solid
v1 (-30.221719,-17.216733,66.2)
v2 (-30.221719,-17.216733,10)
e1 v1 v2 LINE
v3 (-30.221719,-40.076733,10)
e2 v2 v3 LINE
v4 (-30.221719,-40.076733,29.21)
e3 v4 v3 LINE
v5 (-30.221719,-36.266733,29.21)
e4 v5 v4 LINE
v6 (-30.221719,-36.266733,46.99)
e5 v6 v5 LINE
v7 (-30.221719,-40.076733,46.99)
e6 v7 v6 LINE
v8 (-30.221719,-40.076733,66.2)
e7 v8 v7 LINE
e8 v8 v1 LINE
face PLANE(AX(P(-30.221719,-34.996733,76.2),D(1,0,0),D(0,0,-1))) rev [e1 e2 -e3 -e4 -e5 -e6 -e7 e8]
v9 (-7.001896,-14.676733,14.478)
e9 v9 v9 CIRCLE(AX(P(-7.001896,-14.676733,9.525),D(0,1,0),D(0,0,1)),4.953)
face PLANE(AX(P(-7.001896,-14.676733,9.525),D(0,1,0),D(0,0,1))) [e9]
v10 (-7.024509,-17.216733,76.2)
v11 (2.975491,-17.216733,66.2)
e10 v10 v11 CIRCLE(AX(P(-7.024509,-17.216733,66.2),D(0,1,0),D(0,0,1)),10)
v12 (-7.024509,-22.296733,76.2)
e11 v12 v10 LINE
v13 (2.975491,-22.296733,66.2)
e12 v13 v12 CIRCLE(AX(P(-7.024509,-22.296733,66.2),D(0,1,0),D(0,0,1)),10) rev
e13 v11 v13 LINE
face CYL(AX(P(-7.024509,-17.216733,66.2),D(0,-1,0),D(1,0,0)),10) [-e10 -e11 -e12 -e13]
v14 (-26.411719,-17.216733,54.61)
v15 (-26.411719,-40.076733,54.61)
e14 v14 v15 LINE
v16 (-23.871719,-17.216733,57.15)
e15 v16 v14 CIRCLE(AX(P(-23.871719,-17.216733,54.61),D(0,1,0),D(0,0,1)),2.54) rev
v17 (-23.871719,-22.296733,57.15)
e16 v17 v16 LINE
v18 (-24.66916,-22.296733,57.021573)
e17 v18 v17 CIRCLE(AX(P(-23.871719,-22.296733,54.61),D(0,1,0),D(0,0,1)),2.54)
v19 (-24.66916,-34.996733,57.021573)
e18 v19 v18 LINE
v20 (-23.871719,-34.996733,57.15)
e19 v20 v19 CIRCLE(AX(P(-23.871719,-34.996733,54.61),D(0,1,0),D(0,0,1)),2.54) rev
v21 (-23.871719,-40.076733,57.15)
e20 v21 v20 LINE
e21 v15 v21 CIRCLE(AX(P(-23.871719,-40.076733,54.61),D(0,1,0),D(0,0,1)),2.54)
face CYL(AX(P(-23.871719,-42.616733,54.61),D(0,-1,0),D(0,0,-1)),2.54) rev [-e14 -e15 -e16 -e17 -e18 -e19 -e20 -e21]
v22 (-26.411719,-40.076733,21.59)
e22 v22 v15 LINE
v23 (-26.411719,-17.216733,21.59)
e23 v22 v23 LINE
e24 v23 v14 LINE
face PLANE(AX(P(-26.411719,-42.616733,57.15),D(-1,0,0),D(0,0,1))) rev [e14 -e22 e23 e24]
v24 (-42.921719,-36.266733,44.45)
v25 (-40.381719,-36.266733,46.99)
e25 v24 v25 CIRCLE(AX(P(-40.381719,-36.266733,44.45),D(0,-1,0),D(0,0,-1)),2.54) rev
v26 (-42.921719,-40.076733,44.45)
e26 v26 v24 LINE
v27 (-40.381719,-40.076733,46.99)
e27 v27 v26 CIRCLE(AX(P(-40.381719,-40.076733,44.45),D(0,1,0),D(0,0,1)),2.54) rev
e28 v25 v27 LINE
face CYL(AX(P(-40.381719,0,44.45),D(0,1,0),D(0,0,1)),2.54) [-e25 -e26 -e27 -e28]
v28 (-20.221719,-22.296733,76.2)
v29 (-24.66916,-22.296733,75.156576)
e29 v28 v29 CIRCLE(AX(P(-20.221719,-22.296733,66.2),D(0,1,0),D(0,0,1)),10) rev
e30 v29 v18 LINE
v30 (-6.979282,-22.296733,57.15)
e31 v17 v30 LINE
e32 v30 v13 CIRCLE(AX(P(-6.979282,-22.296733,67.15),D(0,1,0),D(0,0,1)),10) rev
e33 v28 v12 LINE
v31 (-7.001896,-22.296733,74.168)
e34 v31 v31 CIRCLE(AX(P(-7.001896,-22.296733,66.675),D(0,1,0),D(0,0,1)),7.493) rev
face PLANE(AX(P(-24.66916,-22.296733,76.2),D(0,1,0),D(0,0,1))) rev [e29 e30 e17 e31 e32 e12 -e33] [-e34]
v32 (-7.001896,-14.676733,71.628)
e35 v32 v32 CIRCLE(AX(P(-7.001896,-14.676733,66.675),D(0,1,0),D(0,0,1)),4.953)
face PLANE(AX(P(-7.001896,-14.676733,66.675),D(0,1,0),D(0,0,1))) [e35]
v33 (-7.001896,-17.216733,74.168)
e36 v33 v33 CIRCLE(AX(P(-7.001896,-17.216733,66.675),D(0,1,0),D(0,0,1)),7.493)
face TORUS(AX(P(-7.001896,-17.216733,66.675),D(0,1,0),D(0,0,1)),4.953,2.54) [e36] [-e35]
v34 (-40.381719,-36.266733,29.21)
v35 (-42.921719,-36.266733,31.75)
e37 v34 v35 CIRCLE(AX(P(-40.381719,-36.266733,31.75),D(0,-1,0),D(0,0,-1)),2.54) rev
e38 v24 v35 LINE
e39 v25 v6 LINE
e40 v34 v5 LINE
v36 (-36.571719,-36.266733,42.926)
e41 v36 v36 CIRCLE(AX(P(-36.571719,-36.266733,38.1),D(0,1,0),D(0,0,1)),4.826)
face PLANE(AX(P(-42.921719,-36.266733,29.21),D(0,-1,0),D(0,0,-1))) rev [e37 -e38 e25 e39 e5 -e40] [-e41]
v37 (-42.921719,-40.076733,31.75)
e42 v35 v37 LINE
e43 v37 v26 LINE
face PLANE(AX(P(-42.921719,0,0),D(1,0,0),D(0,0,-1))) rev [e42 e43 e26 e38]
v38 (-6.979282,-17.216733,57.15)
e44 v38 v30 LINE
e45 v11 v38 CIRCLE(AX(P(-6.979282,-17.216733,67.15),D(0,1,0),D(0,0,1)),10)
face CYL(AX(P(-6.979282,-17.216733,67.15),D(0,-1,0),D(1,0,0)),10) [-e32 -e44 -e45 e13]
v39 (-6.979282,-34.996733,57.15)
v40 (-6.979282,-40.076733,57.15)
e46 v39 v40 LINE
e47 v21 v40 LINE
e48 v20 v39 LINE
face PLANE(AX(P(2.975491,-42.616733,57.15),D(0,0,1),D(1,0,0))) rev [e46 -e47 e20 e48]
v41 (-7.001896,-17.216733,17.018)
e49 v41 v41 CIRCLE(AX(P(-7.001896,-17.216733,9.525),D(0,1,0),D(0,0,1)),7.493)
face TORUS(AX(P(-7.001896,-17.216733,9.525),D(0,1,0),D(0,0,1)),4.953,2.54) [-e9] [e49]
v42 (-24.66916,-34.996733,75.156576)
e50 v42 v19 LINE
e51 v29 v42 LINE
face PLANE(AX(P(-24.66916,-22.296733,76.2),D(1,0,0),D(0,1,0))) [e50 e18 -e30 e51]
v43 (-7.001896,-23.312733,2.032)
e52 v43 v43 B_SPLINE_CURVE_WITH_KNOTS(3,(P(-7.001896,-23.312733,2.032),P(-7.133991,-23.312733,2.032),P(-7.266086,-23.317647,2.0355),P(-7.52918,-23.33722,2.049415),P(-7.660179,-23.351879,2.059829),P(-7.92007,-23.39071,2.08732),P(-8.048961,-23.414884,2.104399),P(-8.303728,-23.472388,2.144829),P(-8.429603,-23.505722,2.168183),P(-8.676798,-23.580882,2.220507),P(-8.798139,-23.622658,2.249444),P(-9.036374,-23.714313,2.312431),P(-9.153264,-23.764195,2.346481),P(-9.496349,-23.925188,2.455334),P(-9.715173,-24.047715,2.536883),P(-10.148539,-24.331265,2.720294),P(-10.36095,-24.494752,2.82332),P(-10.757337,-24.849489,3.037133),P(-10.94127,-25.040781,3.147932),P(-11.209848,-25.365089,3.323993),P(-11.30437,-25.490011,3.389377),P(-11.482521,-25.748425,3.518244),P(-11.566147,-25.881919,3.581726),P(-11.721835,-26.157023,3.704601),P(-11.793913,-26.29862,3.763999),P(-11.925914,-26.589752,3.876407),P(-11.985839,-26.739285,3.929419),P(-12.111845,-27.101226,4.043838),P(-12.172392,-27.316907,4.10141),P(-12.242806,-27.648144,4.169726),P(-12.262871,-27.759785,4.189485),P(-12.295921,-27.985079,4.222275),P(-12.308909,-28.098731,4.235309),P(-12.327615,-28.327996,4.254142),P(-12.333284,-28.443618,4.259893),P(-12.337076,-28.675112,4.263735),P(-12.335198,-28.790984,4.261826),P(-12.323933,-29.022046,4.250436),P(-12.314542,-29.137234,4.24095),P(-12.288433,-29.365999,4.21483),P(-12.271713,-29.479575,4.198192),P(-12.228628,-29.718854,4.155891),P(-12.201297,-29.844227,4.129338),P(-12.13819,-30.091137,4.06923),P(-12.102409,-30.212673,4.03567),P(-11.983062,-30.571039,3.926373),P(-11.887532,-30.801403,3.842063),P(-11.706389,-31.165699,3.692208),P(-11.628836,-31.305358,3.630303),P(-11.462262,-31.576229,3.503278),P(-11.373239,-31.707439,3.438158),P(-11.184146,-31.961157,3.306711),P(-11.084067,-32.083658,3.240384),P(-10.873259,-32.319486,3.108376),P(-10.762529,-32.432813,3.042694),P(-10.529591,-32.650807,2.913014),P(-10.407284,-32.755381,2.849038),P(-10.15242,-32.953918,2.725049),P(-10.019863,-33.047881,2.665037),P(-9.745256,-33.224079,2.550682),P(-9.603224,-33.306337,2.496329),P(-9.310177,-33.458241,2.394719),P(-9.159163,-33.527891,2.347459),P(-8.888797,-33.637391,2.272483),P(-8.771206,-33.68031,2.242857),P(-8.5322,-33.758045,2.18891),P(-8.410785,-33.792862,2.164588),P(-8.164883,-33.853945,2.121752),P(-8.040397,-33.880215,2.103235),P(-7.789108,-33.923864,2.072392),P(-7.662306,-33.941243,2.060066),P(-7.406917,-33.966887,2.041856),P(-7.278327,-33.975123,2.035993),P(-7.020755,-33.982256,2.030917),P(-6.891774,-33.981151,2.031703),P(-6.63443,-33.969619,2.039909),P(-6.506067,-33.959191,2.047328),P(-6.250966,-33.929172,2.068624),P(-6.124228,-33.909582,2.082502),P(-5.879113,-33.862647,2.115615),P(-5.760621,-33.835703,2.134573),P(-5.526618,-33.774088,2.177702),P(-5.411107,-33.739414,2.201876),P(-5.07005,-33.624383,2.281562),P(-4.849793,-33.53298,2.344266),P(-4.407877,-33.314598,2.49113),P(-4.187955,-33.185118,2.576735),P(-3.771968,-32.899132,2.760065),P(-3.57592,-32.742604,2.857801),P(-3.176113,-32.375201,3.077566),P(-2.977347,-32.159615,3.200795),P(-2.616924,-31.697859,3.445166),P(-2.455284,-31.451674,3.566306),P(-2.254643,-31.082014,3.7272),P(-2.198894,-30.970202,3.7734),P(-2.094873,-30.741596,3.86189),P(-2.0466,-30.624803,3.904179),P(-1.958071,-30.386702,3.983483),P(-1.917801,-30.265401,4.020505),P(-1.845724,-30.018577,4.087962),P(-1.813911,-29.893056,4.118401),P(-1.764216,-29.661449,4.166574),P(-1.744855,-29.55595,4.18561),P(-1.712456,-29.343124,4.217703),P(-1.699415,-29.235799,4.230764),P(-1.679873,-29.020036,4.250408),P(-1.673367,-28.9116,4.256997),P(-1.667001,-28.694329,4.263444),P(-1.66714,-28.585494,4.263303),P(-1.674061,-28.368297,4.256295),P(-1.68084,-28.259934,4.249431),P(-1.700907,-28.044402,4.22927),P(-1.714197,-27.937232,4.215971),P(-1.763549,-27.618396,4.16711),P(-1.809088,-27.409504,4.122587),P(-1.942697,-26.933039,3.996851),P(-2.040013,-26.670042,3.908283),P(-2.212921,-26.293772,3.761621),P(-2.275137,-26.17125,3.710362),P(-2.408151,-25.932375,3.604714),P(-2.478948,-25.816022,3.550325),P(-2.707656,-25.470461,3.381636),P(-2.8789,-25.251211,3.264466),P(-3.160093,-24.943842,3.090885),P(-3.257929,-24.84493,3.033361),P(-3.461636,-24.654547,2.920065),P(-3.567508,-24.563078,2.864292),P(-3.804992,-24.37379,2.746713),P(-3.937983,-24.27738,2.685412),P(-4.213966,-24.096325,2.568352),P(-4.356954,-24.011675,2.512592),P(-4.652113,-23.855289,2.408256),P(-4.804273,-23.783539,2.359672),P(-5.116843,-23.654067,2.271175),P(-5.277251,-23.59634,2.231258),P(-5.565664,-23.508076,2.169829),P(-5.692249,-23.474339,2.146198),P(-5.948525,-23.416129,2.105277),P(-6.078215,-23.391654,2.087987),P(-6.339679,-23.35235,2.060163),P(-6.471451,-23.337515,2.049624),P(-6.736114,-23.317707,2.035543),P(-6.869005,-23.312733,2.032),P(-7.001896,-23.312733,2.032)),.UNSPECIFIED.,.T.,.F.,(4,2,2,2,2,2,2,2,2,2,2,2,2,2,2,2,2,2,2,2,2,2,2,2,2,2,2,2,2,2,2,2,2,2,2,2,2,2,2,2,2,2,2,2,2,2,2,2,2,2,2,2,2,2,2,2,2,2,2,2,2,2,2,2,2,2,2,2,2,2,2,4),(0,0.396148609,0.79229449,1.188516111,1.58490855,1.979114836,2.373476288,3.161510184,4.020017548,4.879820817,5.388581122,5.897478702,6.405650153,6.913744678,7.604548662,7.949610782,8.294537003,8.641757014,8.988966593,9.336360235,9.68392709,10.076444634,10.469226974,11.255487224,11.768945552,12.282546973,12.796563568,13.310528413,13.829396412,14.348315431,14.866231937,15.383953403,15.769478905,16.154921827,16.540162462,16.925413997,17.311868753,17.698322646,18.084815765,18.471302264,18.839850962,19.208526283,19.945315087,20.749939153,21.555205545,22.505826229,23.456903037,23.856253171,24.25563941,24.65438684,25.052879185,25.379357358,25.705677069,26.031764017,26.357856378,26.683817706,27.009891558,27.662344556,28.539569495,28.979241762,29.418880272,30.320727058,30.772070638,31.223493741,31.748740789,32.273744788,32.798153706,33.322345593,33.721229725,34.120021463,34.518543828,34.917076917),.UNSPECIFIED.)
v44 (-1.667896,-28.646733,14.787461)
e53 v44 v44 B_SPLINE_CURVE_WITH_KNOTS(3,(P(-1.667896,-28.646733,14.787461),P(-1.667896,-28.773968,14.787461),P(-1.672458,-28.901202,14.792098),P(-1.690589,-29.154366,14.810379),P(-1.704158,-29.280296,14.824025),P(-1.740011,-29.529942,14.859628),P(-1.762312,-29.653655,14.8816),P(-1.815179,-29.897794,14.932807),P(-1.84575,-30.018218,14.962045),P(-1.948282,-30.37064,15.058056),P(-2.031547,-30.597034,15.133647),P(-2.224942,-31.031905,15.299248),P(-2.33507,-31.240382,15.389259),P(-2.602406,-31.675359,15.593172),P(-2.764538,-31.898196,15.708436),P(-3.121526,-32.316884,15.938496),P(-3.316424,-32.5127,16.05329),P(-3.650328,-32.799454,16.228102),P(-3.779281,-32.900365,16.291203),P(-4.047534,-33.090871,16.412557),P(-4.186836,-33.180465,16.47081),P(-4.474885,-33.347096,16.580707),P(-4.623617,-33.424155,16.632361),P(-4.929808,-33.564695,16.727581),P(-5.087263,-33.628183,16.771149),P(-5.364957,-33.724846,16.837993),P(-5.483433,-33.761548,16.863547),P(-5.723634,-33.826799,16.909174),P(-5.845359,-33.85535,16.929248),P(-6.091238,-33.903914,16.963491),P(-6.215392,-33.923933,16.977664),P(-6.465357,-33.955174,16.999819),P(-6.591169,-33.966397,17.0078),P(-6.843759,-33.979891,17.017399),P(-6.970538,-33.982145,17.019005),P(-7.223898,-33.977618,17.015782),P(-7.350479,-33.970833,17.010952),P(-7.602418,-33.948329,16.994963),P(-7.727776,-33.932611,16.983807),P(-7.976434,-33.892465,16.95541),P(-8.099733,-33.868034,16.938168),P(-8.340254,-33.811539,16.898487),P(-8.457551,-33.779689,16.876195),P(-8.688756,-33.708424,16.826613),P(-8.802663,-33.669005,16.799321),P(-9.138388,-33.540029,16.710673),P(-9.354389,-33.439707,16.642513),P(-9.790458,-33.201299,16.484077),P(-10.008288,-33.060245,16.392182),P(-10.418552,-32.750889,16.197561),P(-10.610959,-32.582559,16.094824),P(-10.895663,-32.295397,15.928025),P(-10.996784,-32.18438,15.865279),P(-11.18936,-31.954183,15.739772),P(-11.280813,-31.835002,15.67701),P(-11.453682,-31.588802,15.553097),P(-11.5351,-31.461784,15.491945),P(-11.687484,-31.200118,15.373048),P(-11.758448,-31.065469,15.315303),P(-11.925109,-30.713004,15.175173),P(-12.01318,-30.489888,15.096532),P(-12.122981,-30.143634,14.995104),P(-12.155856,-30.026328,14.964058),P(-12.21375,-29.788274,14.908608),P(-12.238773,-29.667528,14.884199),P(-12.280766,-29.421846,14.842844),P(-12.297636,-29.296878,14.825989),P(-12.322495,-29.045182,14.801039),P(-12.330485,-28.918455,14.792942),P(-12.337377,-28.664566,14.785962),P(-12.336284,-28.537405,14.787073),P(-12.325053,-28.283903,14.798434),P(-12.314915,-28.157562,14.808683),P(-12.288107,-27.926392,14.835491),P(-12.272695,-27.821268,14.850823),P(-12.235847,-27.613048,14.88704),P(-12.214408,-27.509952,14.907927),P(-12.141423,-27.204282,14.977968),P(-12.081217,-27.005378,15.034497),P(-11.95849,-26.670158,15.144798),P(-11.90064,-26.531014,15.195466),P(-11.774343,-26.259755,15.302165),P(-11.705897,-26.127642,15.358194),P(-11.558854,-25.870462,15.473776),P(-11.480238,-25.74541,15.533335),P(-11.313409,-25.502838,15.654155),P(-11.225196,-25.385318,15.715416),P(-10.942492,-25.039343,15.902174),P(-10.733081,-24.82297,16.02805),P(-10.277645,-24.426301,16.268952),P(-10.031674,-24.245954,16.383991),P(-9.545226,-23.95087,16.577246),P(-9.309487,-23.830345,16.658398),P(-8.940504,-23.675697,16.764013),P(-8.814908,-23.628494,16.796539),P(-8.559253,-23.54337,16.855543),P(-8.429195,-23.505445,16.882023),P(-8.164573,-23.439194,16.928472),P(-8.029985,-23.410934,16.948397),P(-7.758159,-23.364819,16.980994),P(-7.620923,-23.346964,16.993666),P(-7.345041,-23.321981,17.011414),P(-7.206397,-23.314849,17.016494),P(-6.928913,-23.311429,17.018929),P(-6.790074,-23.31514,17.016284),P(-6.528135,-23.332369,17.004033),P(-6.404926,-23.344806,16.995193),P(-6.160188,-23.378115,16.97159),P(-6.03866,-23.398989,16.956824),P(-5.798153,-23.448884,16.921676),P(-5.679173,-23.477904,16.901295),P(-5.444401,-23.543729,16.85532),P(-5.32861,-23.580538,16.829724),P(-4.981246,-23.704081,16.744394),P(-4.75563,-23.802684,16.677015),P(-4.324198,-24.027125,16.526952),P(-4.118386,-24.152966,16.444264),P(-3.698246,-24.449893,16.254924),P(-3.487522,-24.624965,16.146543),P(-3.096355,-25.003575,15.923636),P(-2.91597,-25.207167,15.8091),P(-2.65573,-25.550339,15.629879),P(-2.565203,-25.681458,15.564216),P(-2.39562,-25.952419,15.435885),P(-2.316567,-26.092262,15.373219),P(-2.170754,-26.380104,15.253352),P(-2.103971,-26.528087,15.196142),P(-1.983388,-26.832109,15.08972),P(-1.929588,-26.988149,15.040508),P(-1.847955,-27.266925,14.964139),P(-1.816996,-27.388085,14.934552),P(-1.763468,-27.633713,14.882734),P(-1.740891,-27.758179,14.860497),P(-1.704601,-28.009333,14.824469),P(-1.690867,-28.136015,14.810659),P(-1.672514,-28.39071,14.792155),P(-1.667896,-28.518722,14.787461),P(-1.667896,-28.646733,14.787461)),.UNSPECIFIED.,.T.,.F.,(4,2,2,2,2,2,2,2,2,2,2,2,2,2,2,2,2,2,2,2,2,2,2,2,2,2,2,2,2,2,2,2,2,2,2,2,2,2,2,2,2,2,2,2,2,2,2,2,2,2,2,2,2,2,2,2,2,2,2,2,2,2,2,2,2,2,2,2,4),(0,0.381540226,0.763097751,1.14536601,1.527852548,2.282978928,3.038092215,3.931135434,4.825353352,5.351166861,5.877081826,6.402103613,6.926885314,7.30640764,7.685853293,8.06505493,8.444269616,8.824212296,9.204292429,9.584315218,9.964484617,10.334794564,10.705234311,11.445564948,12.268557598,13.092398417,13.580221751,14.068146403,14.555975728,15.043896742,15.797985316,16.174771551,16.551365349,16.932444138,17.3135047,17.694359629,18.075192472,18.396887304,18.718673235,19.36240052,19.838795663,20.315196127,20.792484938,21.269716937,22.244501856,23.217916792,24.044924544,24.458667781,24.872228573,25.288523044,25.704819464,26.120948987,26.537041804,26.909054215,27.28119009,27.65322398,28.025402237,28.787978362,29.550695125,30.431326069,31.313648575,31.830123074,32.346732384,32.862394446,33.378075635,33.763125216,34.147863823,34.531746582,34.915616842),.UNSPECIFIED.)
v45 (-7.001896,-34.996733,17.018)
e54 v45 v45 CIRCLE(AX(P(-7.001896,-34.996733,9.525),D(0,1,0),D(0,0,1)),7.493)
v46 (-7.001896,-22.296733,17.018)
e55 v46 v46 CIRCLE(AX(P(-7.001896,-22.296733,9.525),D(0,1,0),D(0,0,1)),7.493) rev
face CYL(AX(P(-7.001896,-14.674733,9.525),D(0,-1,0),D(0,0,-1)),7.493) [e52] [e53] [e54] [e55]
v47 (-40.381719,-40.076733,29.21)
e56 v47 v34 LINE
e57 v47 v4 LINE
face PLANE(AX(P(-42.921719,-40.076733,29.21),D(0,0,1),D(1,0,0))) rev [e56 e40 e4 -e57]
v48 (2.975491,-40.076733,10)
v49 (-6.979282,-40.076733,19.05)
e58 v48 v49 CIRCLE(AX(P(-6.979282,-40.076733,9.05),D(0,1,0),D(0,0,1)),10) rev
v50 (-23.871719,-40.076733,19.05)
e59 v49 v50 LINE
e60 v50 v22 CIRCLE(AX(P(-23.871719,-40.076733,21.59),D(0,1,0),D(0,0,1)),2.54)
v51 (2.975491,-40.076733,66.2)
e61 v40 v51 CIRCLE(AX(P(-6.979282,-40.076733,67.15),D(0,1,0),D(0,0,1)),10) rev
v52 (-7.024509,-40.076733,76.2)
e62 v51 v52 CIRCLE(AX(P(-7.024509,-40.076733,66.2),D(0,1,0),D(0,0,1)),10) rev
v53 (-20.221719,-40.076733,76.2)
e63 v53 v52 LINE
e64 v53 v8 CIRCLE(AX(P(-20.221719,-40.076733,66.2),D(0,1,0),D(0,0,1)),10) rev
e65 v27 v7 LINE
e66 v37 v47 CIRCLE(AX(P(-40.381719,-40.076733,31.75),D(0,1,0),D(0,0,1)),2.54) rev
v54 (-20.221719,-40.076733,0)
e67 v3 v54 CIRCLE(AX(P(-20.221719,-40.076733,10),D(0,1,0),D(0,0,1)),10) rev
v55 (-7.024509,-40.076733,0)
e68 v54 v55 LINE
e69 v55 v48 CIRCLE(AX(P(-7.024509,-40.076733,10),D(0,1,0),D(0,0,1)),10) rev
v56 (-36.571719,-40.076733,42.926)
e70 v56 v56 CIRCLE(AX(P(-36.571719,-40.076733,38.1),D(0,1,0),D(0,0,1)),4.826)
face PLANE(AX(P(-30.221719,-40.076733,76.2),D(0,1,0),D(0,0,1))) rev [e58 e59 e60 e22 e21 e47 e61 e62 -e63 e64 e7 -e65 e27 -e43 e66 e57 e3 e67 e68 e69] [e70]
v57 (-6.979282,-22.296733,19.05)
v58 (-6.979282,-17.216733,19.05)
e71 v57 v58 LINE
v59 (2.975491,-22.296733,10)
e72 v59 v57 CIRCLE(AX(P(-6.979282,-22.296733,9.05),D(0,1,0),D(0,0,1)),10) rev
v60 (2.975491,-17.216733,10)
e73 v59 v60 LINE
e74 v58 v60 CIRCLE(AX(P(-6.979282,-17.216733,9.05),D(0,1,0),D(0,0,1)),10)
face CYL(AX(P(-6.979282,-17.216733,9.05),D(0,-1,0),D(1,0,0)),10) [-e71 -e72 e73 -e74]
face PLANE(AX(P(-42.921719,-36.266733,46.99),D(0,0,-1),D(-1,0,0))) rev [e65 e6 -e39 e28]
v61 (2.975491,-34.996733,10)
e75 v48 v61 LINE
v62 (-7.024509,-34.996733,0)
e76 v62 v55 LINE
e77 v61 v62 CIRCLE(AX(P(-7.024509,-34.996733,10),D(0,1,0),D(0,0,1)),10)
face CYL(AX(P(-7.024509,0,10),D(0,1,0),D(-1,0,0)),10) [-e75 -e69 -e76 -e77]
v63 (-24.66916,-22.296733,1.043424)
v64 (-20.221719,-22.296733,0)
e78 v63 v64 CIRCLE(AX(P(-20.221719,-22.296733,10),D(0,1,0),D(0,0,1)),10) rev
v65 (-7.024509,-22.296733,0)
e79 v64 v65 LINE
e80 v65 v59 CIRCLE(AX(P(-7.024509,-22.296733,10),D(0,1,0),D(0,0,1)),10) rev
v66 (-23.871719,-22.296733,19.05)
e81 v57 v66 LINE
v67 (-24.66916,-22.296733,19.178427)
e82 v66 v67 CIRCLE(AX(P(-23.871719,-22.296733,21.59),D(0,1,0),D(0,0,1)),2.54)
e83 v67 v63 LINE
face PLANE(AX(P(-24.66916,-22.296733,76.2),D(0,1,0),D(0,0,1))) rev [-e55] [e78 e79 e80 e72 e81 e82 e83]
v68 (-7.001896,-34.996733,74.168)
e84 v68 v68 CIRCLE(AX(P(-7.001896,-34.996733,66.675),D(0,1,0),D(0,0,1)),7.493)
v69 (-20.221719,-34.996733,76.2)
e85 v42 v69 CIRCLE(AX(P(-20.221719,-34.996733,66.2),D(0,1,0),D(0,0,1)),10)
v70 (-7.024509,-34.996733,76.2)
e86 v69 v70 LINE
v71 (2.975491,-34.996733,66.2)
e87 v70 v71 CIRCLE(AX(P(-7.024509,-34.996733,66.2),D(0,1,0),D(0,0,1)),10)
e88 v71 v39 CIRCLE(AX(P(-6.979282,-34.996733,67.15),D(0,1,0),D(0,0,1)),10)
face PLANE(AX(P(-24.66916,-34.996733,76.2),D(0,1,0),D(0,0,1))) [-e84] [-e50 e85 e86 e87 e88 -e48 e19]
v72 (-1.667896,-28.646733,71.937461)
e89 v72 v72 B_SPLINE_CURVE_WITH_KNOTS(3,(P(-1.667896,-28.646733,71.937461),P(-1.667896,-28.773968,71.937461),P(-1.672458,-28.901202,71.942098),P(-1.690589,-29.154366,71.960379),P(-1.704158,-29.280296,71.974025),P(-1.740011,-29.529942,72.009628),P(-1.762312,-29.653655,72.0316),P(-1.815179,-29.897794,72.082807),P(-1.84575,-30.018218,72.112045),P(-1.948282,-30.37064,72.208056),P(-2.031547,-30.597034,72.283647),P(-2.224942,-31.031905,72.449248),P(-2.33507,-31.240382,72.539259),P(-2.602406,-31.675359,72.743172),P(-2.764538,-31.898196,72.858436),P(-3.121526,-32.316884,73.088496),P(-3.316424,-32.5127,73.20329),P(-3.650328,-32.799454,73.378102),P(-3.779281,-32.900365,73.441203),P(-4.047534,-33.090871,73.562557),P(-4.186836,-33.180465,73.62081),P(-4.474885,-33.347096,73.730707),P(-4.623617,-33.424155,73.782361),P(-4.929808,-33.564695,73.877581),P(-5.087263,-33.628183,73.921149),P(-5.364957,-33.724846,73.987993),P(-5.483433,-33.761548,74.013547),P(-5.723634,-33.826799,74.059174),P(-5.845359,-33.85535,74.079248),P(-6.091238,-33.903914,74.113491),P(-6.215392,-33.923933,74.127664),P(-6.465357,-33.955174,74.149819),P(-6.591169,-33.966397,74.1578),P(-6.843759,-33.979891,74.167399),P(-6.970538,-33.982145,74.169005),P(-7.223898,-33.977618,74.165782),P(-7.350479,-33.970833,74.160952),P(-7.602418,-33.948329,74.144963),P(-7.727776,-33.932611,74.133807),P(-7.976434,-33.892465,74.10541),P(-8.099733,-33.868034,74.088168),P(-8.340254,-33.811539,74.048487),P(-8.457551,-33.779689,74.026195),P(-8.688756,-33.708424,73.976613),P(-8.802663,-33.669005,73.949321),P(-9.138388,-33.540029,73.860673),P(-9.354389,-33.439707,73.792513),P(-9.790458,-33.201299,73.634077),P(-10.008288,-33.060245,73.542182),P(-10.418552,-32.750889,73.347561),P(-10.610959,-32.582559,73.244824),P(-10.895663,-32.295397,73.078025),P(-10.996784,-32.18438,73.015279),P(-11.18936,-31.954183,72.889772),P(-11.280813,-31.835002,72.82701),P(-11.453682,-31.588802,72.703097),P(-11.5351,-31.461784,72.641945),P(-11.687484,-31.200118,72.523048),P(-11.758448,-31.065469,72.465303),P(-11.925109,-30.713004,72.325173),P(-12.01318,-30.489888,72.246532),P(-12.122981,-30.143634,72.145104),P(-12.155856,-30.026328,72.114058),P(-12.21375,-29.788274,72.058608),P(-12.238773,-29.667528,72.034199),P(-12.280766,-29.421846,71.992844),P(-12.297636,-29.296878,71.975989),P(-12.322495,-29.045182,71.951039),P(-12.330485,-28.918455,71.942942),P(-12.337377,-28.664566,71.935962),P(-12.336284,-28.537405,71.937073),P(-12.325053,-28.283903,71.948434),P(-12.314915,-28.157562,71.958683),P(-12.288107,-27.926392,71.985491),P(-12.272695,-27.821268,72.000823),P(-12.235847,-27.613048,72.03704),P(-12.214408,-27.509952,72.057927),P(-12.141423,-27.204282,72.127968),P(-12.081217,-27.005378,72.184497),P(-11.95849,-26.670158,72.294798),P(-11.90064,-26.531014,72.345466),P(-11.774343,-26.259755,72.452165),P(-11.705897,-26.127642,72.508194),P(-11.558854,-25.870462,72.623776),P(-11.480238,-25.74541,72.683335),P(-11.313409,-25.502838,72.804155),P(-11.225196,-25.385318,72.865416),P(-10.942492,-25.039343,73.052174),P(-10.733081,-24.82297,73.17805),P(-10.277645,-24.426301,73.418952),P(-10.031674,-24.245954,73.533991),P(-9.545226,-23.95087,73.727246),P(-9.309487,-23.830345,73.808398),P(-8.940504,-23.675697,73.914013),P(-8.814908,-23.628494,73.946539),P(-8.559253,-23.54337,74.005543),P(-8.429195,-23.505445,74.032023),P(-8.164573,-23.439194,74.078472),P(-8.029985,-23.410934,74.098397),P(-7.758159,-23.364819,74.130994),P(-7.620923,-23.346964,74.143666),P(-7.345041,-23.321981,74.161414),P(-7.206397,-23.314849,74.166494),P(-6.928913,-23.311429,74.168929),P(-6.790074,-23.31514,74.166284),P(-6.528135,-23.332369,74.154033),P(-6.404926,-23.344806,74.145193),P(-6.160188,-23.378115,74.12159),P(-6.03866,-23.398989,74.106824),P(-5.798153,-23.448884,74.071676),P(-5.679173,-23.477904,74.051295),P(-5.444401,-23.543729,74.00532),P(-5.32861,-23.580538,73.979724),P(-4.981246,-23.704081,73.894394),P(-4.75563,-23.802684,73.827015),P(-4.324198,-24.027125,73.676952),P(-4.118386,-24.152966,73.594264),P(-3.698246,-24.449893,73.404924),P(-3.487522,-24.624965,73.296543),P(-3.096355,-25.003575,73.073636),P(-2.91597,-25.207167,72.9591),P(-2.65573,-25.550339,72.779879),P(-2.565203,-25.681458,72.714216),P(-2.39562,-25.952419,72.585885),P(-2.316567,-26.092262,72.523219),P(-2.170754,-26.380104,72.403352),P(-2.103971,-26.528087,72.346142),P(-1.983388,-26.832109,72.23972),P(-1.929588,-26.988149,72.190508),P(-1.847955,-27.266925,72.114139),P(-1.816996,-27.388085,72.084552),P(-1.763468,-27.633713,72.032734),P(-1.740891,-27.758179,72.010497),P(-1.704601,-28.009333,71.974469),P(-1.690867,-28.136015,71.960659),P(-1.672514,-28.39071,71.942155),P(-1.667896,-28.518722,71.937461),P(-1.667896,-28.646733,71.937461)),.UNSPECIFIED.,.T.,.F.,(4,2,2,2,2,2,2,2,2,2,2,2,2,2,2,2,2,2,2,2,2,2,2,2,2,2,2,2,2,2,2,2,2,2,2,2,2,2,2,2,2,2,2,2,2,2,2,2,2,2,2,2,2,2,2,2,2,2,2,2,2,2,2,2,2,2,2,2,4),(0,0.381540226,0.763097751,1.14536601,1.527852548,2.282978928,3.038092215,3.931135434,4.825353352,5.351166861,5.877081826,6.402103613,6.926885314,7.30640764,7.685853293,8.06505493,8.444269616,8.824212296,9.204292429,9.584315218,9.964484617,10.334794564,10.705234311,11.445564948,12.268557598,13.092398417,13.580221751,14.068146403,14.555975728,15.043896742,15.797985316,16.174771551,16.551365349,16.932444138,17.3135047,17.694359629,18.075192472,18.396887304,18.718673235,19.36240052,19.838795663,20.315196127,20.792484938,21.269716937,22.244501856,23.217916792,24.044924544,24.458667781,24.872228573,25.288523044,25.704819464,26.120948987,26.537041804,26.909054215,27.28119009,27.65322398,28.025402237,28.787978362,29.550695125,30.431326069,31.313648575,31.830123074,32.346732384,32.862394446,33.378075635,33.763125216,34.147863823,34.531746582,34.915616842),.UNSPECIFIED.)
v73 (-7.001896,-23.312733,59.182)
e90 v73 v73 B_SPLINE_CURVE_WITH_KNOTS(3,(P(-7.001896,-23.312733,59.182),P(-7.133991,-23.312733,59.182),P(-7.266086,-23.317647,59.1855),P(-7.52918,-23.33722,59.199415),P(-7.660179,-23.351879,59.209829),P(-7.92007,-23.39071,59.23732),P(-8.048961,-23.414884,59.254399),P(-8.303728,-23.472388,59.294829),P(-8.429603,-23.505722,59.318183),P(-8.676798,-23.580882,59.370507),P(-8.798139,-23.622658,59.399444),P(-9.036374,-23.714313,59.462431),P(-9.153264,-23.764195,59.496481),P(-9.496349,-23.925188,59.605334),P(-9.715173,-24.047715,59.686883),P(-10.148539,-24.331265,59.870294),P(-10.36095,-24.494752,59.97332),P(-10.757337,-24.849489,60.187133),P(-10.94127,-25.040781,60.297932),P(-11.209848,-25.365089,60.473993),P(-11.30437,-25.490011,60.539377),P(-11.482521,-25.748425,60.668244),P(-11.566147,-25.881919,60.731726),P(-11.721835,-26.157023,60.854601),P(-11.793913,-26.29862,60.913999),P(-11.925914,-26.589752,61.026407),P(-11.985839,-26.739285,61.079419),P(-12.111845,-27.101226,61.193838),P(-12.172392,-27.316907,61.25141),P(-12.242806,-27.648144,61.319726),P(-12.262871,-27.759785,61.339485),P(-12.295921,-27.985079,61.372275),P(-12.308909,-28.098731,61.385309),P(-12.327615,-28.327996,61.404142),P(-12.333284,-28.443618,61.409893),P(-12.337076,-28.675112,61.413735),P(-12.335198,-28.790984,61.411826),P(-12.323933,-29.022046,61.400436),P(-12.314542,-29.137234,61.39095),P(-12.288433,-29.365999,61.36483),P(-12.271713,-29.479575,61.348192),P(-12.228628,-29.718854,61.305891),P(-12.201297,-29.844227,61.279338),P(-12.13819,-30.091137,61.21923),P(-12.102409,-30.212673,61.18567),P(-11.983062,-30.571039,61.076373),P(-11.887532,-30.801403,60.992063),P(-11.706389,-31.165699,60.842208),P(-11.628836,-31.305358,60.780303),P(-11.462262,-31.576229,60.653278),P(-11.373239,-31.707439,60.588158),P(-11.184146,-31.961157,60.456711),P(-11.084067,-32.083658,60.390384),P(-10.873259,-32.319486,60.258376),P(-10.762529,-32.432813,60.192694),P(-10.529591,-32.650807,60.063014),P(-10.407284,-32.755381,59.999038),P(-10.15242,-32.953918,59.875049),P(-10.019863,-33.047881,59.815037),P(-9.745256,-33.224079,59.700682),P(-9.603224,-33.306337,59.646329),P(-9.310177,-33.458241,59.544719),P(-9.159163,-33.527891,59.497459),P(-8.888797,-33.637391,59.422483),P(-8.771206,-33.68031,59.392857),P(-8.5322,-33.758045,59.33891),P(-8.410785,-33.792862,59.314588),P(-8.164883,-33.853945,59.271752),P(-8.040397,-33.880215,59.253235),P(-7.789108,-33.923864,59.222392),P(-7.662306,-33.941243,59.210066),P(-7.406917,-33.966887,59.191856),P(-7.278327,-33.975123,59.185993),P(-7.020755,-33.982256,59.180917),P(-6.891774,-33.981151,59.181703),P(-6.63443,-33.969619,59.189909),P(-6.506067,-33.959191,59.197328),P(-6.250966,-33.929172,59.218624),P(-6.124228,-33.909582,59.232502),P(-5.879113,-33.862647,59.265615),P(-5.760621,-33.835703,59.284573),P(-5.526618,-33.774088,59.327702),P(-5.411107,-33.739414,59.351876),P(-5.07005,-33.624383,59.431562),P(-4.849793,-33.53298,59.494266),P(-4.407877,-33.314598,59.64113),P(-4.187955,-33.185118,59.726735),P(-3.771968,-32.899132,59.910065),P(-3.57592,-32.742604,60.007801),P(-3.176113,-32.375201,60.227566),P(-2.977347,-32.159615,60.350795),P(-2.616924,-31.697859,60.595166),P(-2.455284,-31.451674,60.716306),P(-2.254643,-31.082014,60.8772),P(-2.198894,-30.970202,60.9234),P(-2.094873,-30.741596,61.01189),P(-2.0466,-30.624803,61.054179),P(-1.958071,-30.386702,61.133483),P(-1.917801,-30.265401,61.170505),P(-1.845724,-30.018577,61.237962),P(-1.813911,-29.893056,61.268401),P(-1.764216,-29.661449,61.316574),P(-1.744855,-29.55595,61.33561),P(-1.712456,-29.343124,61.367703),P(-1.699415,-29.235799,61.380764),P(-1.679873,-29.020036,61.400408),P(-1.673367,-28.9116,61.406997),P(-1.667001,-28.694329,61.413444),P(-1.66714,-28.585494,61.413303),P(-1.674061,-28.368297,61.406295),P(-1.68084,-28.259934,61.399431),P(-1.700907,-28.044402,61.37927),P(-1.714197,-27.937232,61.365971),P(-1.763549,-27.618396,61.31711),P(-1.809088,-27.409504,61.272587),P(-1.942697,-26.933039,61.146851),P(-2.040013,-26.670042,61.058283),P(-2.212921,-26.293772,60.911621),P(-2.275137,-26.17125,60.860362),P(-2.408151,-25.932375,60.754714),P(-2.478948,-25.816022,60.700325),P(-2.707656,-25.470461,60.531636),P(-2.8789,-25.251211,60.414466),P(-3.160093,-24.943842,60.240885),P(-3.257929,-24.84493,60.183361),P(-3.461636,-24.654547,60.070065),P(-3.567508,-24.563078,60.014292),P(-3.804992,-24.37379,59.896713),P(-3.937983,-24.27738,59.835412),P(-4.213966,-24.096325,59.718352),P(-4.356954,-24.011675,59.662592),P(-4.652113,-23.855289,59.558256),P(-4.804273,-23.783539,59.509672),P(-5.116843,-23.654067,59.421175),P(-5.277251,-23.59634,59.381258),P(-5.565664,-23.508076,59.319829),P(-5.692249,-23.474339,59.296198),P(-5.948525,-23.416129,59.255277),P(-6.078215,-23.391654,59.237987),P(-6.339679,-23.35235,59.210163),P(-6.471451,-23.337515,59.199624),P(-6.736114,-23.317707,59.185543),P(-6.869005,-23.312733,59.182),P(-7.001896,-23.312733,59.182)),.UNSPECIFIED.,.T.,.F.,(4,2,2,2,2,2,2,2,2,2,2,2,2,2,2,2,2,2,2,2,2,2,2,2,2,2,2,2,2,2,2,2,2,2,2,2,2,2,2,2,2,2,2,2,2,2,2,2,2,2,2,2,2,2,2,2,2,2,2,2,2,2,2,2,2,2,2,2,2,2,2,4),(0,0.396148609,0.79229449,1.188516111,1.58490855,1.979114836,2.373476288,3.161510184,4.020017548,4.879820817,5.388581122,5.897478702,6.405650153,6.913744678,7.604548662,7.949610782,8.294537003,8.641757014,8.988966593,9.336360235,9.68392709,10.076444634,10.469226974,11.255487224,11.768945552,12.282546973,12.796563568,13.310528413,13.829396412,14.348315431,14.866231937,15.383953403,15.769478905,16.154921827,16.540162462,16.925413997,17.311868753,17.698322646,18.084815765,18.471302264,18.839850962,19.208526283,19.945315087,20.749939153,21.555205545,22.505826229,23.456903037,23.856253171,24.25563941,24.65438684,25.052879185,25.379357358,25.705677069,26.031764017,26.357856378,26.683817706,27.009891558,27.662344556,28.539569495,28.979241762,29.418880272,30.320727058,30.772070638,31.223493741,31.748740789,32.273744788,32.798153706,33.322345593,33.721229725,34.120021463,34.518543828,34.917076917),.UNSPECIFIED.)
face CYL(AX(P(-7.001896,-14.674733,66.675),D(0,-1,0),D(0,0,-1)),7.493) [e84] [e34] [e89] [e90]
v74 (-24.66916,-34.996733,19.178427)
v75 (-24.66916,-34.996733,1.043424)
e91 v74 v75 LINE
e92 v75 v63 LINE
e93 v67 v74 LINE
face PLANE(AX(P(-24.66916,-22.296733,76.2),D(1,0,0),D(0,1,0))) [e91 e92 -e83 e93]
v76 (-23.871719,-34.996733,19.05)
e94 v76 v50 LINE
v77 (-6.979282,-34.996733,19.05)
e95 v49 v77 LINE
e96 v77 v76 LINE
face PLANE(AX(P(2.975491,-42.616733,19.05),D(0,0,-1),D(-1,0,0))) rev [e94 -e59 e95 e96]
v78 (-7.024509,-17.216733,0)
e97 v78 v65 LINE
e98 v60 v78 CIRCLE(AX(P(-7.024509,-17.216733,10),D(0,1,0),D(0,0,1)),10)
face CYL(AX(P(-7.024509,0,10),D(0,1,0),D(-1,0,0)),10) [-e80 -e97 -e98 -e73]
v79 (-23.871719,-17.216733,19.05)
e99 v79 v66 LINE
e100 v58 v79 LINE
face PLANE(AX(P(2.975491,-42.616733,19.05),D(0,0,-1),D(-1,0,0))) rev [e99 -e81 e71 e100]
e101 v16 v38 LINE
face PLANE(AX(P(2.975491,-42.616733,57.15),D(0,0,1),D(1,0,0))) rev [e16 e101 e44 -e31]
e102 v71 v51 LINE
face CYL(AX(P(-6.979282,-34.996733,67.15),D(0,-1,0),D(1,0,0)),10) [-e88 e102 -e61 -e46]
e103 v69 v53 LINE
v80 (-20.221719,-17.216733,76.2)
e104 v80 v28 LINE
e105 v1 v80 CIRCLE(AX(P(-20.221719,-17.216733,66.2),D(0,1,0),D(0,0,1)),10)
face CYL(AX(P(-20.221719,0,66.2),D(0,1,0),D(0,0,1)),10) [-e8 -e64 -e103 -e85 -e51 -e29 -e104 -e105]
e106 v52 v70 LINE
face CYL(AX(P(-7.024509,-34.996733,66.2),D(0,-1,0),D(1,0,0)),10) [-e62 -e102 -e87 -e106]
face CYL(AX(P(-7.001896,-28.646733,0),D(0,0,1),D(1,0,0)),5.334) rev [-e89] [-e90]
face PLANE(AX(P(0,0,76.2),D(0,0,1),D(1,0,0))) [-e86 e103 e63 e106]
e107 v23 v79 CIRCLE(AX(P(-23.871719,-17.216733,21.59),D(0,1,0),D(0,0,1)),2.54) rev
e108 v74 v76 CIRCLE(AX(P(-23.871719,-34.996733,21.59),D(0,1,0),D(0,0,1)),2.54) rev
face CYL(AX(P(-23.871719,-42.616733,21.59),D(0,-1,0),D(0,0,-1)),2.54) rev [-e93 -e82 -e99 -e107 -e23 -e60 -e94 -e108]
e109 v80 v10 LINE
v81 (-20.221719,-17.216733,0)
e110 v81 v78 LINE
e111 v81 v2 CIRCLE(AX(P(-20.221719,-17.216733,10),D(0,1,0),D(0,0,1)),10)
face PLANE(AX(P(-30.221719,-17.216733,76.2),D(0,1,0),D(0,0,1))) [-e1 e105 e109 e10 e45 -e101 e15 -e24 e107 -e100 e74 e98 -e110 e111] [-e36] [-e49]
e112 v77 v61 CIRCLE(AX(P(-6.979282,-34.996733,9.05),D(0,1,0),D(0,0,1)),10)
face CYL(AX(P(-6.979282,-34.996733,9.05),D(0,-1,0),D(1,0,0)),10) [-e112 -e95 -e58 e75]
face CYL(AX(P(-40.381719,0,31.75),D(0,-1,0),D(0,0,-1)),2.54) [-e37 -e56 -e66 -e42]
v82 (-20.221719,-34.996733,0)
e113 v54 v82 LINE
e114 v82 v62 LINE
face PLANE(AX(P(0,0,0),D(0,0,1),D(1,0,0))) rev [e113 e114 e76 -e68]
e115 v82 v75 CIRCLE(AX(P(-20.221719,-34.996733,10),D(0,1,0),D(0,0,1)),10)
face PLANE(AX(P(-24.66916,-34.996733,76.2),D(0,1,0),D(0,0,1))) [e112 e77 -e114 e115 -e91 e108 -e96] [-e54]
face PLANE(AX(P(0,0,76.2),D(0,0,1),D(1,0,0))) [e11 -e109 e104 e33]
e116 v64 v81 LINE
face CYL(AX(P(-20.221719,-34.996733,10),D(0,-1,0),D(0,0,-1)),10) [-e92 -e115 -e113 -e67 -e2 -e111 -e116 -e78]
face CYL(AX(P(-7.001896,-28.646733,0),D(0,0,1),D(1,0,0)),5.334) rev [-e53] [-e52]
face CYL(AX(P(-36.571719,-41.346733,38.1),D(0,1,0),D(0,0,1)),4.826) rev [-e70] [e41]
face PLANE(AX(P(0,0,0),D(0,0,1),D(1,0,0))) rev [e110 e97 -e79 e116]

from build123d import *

# Parameters (mm, degrees)
BOSS_EXTRUDE4_DEPTH = 76.2
FILLET1_R           = 10
SKETCH8_W           = 29.387209302
SKETCH8_H           = 38.1
CUT_EXTRUDE2_DEPTH  = 25.4
FILLET2_R           = 10
SKETCH9_R           = 7.493
BOSS_EXTRUDE5_DEPTH = 2.54
FILLET4_R           = 2.54
BOSS_EXTRUDE6_REACH = 86.455
SKETCH10_R          = 7.493
SKETCH11_R          = 5.334
CUT_EXTRUDE3_DEPTH  = 76.2
FILLET5_R           = 2.54
BOSS_EXTRUDE7_DEPTH = 12.7
FILLET6_R           = 2.54
SKETCH13_R          = 4.826
CUT_EXTRUDE4_DEPTH  = 5.08


# Some blends are built 0.0001 mm under size
with BuildPart() as part:
    # Sketch7 → Boss-Extrude4 (new body)
    with BuildSketch(Plane.XY):
        Polygon((-30.221718637, -17.216733289), (2.975490665, -17.216733289), (2.975490665, -22.296733289), (-24.669160498, -22.296733289), (-24.669160498, -34.996733289), (2.975490665, -34.996733289), (2.975490665, -40.076733289), (-30.221718637, -40.076733289), (-30.221718637, -34.996733289), (-30.221718637, -22.296733289), align=None)
    extrude(amount=BOSS_EXTRUDE4_DEPTH)

    # Fillet1
    # the kernel refuses this fillet: 10 mm, written as the material it takes off along each edge
    with BuildSketch(Plane(origin=(-30.221718637, -65.076733289, 76.2), x_dir=(1, 0, 0), z_dir=(0, 1, 0)), Plane(origin=(-30.221718637, 7.783266711, 0), x_dir=(1, 0, 0), z_dir=(0, -1, 0))) as fillet1_piece_1:
        with BuildLine():
            CenterArc((FILLET1_R, FILLET1_R), FILLET1_R, 180, 90)
            Line((0, FILLET1_R), (0, 0))
            Line((0, 0), (FILLET1_R, 0))
        make_face()
    extrude(amount=72.86, mode=Mode.SUBTRACT)
    with BuildSketch(Plane(origin=(2.975490665, -9.996733289, 76.2), x_dir=(-1, 0, 0), z_dir=(0, -1, 0)), Plane(origin=(2.975490665, 7.783266711, 76.2), x_dir=(-1, 0, 0), z_dir=(0, -1, 0)), Plane(origin=(2.975490665, -9.996733289, 0), x_dir=(0, 0, 1), z_dir=(0, -1, 0))) as fillet1_piece_2:
        with BuildLine():
            CenterArc((FILLET1_R, FILLET1_R), FILLET1_R, 180, 90)
            Line((0, FILLET1_R), (0, 0))
            Line((0, 0), (FILLET1_R, 0))
        make_face()
    extrude(amount=55.08, mode=Mode.SUBTRACT)
    with BuildSketch(Plane(origin=(2.975490665, 7.783266711, 0), x_dir=(-1, 0, 0), z_dir=(0, -1, 0))) as fillet1_piece_3:
        with BuildLine():
            CenterArc((FILLET1_R, -FILLET1_R), FILLET1_R, 90, 90)
            Line((0, -FILLET1_R), (0, 0))
            Line((0, 0), (FILLET1_R, 0))
        make_face()
    extrude(amount=55.08, mode=Mode.SUBTRACT)

    # Sketch8 → Cut-Extrude2 (cut)
    with BuildSketch(Plane(origin=(0, -17.216733289, 0), x_dir=(1, 0, 0), z_dir=(0, 1, 0))):
        with Locations((-11.718113986, -38.1)):
            Rectangle(SKETCH8_W, SKETCH8_H)
    extrude(amount=-CUT_EXTRUDE2_DEPTH, mode=Mode.SUBTRACT)

    # Fillet2
    # the kernel refuses this fillet: 10 mm, written as the material it takes off along each edge
    with BuildSketch(Plane(origin=(2.975490665, -10.109801477, 57.15), x_dir=(-1, 0, 0), z_dir=(0, -1, 0)), Plane(origin=(2.975490665, 7.670198523, 57.15), x_dir=(-1, 0, 0), z_dir=(0, -1, 0))) as fillet2_piece_1:
        with BuildLine():
            CenterArc((9.954772725, -10), FILLET2_R, 90, 84.548680188)
            Line((0, -9.05), (-0.199095454, -9.031))
            ThreePointArc((-0.199095454, -9.031), (-0.2, -4.525), (-0.2, 0))
            Line((-0.2, 0), (0, 0.2))
            Line((0, 0.2), (9.954772725, 0.2))
            Line((9.954772725, 0.2), (9.954772725, 0))
        make_face()
    extrude(amount=54.853863623, mode=Mode.SUBTRACT)
    with BuildSketch(Plane(origin=(2.975490665, -10.109801477, 19.05), x_dir=(-1, 0, 0), z_dir=(0, -1, 0))) as fillet2_piece_2:
        with BuildLine():
            CenterArc((9.954772725, 10), FILLET2_R, 185.451319812, 84.548680188)
            Line((0, 9.05), (-0.199095454, 9.031))
            ThreePointArc((-0.199095454, 9.031), (-0.2, 4.525), (-0.2, 0))
            Line((-0.2, 0), (0, -0.2))
            Line((0, -0.2), (9.954772725, -0.2))
            Line((9.954772725, -0.2), (9.954772725, 0))
        make_face()
    extrude(amount=54.853863623, mode=Mode.SUBTRACT)
    with BuildSketch(Plane(origin=(2.975490665, 7.670198523, 19.05), x_dir=(0, 0, -1), z_dir=(0, -1, 0))) as fillet2_piece_3:
        with BuildLine():
            CenterArc((10, -9.954772725), FILLET2_R, 95.451319812, 84.548680188)
            Line((0, -9.954772725), (-0.2, -9.954772725))
            Line((-0.2, -9.954772725), (-0.2, 0))
            Line((-0.2, 0), (0, 0.2))
            ThreePointArc((0, 0.2), (4.525, 0.2), (9.031, 0.199095454))
            Line((9.031, 0.199095454), (9.05, 0))
        make_face()
    extrude(amount=54.853863623, mode=Mode.SUBTRACT)

    # Sketch9 → Boss-Extrude5 (add)
    with BuildSketch(Plane(origin=(0, -17.216733289, 0), x_dir=(1, 0, 0), z_dir=(0, 1, 0))):
        with Locations(Location((-7.001895697, -66.675, 0), (0, 0, 270))):
            Circle(SKETCH9_R)
        with Locations(Location((-7.001895697, -9.525, 0), (0, 0, 270))):
            Circle(SKETCH9_R)
    extrude(amount=BOSS_EXTRUDE5_DEPTH)

    # Fillet4
    fillet4_edges = [part.edges().sort_by_distance(p)[0] for p in [
        (-7.001895697, -14.676733289, 59.182),
        (-7.001895697, -14.676733289, 2.032),
    ]]
    fillet(fillet4_edges, radius=FILLET4_R - 0.0001)  # a hair under: the kernel refuses the full size

    # Sketch10 → Boss-Extrude6 (add, up to next)
    with BuildSketch(Plane(origin=(0, -34.996733289, 0), x_dir=(1, 0, 0), z_dir=(0, 1, 0)), mode=Mode.PRIVATE) as boss_extrude6_sk1:
        with Locations(Location((-7.001895697, -66.675, 0), (0, 0, 90))):
            Circle(SKETCH10_R)
    boss_extrude6_tool1 = extrude(boss_extrude6_sk1.sketch, amount=BOSS_EXTRUDE6_REACH, mode=Mode.PRIVATE) - part.part
    # Sketch10 → Boss-Extrude6 (add, up to next)
    with BuildSketch(Plane(origin=(0, -34.996733289, 0), x_dir=(1, 0, 0), z_dir=(0, 1, 0)), mode=Mode.PRIVATE) as boss_extrude6_sk2:
        with Locations(Location((-7.001895697, -9.525, 0), (0, 0, 90))):
            Circle(SKETCH10_R)
    boss_extrude6_tool2 = extrude(boss_extrude6_sk2.sketch, amount=BOSS_EXTRUDE6_REACH, mode=Mode.PRIVATE) - part.part
    add(boss_extrude6_tool1.solids().sort_by_distance((-7.001896, -34.996733, 66.675))[0])
    add(boss_extrude6_tool2.solids().sort_by_distance((-7.001896, -34.996733, 9.525))[0])

    # Sketch11 → Cut-Extrude3 (cut)
    with BuildSketch(Plane.XY.offset(76.2)):
        with Locations(Location((-7.001895697, -28.646733289, 0), (0, 0, 90.00000003))):
            Circle(SKETCH11_R)
    extrude(amount=-CUT_EXTRUDE3_DEPTH, mode=Mode.SUBTRACT)

    # Fillet5
    # the kernel refuses this fillet: 2.54 mm, written as the material it adds along each edge
    with BuildSketch(Plane(origin=(-26.411718637, -17.216733289, 57.15), x_dir=(0, 0, -1), z_dir=(0, -1, 0))) as fillet5_piece_1_section:
        with BuildLine():
            CenterArc((FILLET5_R, FILLET5_R), FILLET5_R, 180, 90)
            Line((0, FILLET5_R), (0, 0))
            Line((0, 0), (FILLET5_R, 0))
        make_face()
    fillet5_piece_1 = extrude(amount=22.86, mode=Mode.PRIVATE)
    fillet5_piece_1 = split(fillet5_piece_1, bisect_by=Plane(origin=(-24.669160498, -17.216733289, 57.15), z_dir=(-1, 0, 0)), keep=Keep.TOP, mode=Mode.PRIVATE)
    fillet5_piece_1 = split(fillet5_piece_1, bisect_by=Plane(origin=(-26.411718637, -22.296733289, 57.15), z_dir=(0, 1, 0)), keep=Keep.TOP, mode=Mode.PRIVATE)
    add(fillet5_piece_1)
    with BuildSketch(Plane(origin=(-26.411718637, -17.216733289, 57.15), x_dir=(0, 0, -1), z_dir=(0, -1, 0))) as fillet5_piece_2_section:
        with BuildLine():
            CenterArc((FILLET5_R, FILLET5_R), FILLET5_R, 180, 90)
            Line((0, FILLET5_R), (0, 0))
            Line((0, 0), (FILLET5_R, 0))
        make_face()
    fillet5_piece_2 = extrude(amount=22.86, mode=Mode.PRIVATE)
    fillet5_piece_2 = split(fillet5_piece_2, bisect_by=Plane(origin=(-24.669160498, -17.216733289, 57.15), z_dir=(1, 0, 0)), keep=Keep.TOP, mode=Mode.PRIVATE)
    fillet5_piece_2 = split(fillet5_piece_2, bisect_by=Plane(origin=(-26.411718637, -22.296733289, 57.15), z_dir=(0, 1, 0)), keep=Keep.TOP, mode=Mode.PRIVATE)
    add(fillet5_piece_2)
    with BuildSketch(Plane(origin=(-26.411718637, -17.216733289, 57.15), x_dir=(0, 0, -1), z_dir=(0, -1, 0))) as fillet5_piece_3_section:
        with BuildLine():
            CenterArc((FILLET5_R, FILLET5_R), FILLET5_R, 180, 90)
            Line((0, FILLET5_R), (0, 0))
            Line((0, 0), (FILLET5_R, 0))
        make_face()
    fillet5_piece_3 = extrude(amount=22.86, mode=Mode.PRIVATE)
    fillet5_piece_3 = split(fillet5_piece_3, bisect_by=Plane(origin=(-26.411718637, -34.996733289, 57.15), z_dir=(0, 1, 0)), keep=Keep.TOP, mode=Mode.PRIVATE)
    fillet5_piece_3 = split(fillet5_piece_3, bisect_by=Plane(origin=(-24.669160498, -17.216733289, 57.15), z_dir=(-1, 0, 0)), keep=Keep.TOP, mode=Mode.PRIVATE)
    fillet5_piece_3 = split(fillet5_piece_3, bisect_by=Plane(origin=(-26.411718637, -22.296733289, 57.15), z_dir=(0, -1, 0)), keep=Keep.TOP, mode=Mode.PRIVATE)
    add(fillet5_piece_3)
    with BuildSketch(Plane(origin=(-26.411718637, -17.216733289, 57.15), x_dir=(0, 0, -1), z_dir=(0, -1, 0))) as fillet5_piece_4_section:
        with BuildLine():
            CenterArc((FILLET5_R, FILLET5_R), FILLET5_R, 180, 90)
            Line((0, FILLET5_R), (0, 0))
            Line((0, 0), (FILLET5_R, 0))
        make_face()
    fillet5_piece_4 = extrude(amount=22.86, mode=Mode.PRIVATE)
    fillet5_piece_4 = split(fillet5_piece_4, bisect_by=Plane(origin=(-26.411718637, -34.996733289, 57.15), z_dir=(0, -1, 0)), keep=Keep.TOP, mode=Mode.PRIVATE)
    fillet5_piece_4 = split(fillet5_piece_4, bisect_by=Plane(origin=(-24.669160498, -17.216733289, 57.15), z_dir=(-1, 0, 0)), keep=Keep.TOP, mode=Mode.PRIVATE)
    add(fillet5_piece_4)
    with BuildSketch(Plane(origin=(-26.411718637, -17.216733289, 57.15), x_dir=(0, 0, -1), z_dir=(0, -1, 0))) as fillet5_piece_5_section:
        with BuildLine():
            CenterArc((FILLET5_R, FILLET5_R), FILLET5_R, 180, 90)
            Line((0, FILLET5_R), (0, 0))
            Line((0, 0), (FILLET5_R, 0))
        make_face()
    fillet5_piece_5 = extrude(amount=22.86, mode=Mode.PRIVATE)
    fillet5_piece_5 = split(fillet5_piece_5, bisect_by=Plane(origin=(-26.411718637, -34.996733289, 57.15), z_dir=(0, -1, 0)), keep=Keep.TOP, mode=Mode.PRIVATE)
    fillet5_piece_5 = split(fillet5_piece_5, bisect_by=Plane(origin=(-24.669160498, -17.216733289, 57.15), z_dir=(1, 0, 0)), keep=Keep.TOP, mode=Mode.PRIVATE)
    add(fillet5_piece_5)
    with BuildSketch(Plane(origin=(-26.411718637, -17.216733289, 19.05), x_dir=(1, 0, 0), z_dir=(0, -1, 0))) as fillet5_piece_6_section:
        with BuildLine():
            CenterArc((FILLET5_R, FILLET5_R), FILLET5_R, 180, 90)
            Line((0, FILLET5_R), (0, 0))
            Line((0, 0), (FILLET5_R, 0))
        make_face()
    fillet5_piece_6 = extrude(amount=22.86, mode=Mode.PRIVATE)
    fillet5_piece_6 = split(fillet5_piece_6, bisect_by=Plane(origin=(-26.411718637, -22.296733289, 19.05), z_dir=(0, 1, 0)), keep=Keep.TOP, mode=Mode.PRIVATE)
    fillet5_piece_6 = split(fillet5_piece_6, bisect_by=Plane(origin=(-24.669160498, -17.216733289, 19.05), z_dir=(1, 0, 0)), keep=Keep.TOP, mode=Mode.PRIVATE)
    add(fillet5_piece_6)
    with BuildSketch(Plane(origin=(-26.411718637, -17.216733289, 19.05), x_dir=(1, 0, 0), z_dir=(0, -1, 0))) as fillet5_piece_7_section:
        with BuildLine():
            CenterArc((FILLET5_R, FILLET5_R), FILLET5_R, 180, 90)
            Line((0, FILLET5_R), (0, 0))
            Line((0, 0), (FILLET5_R, 0))
        make_face()
    fillet5_piece_7 = extrude(amount=22.86, mode=Mode.PRIVATE)
    fillet5_piece_7 = split(fillet5_piece_7, bisect_by=Plane(origin=(-26.411718637, -22.296733289, 19.05), z_dir=(0, 1, 0)), keep=Keep.TOP, mode=Mode.PRIVATE)
    fillet5_piece_7 = split(fillet5_piece_7, bisect_by=Plane(origin=(-24.669160498, -17.216733289, 19.05), z_dir=(-1, 0, 0)), keep=Keep.TOP, mode=Mode.PRIVATE)
    add(fillet5_piece_7)
    with BuildSketch(Plane(origin=(-26.411718637, -17.216733289, 19.05), x_dir=(1, 0, 0), z_dir=(0, -1, 0))) as fillet5_piece_8_section:
        with BuildLine():
            CenterArc((FILLET5_R, FILLET5_R), FILLET5_R, 180, 90)
            Line((0, FILLET5_R), (0, 0))
            Line((0, 0), (FILLET5_R, 0))
        make_face()
    fillet5_piece_8 = extrude(amount=22.86, mode=Mode.PRIVATE)
    fillet5_piece_8 = split(fillet5_piece_8, bisect_by=Plane(origin=(-26.411718637, -22.296733289, 19.05), z_dir=(0, -1, 0)), keep=Keep.TOP, mode=Mode.PRIVATE)
    fillet5_piece_8 = split(fillet5_piece_8, bisect_by=Plane(origin=(-24.669160498, -17.216733289, 19.05), z_dir=(-1, 0, 0)), keep=Keep.TOP, mode=Mode.PRIVATE)
    fillet5_piece_8 = split(fillet5_piece_8, bisect_by=Plane(origin=(-26.411718637, -34.996733289, 19.05), z_dir=(0, 1, 0)), keep=Keep.TOP, mode=Mode.PRIVATE)
    add(fillet5_piece_8)
    with BuildSketch(Plane(origin=(-26.411718637, -17.216733289, 19.05), x_dir=(1, 0, 0), z_dir=(0, -1, 0))) as fillet5_piece_9_section:
        with BuildLine():
            CenterArc((FILLET5_R, FILLET5_R), FILLET5_R, 180, 90)
            Line((0, FILLET5_R), (0, 0))
            Line((0, 0), (FILLET5_R, 0))
        make_face()
    fillet5_piece_9 = extrude(amount=22.86, mode=Mode.PRIVATE)
    fillet5_piece_9 = split(fillet5_piece_9, bisect_by=Plane(origin=(-24.669160498, -17.216733289, 19.05), z_dir=(1, 0, 0)), keep=Keep.TOP, mode=Mode.PRIVATE)
    fillet5_piece_9 = split(fillet5_piece_9, bisect_by=Plane(origin=(-26.411718637, -34.996733289, 19.05), z_dir=(0, -1, 0)), keep=Keep.TOP, mode=Mode.PRIVATE)
    add(fillet5_piece_9)
    with BuildSketch(Plane(origin=(-26.411718637, -17.216733289, 19.05), x_dir=(1, 0, 0), z_dir=(0, -1, 0))) as fillet5_piece_10_section:
        with BuildLine():
            CenterArc((FILLET5_R, FILLET5_R), FILLET5_R, 180, 90)
            Line((0, FILLET5_R), (0, 0))
            Line((0, 0), (FILLET5_R, 0))
        make_face()
    fillet5_piece_10 = extrude(amount=22.86, mode=Mode.PRIVATE)
    fillet5_piece_10 = split(fillet5_piece_10, bisect_by=Plane(origin=(-24.669160498, -17.216733289, 19.05), z_dir=(-1, 0, 0)), keep=Keep.TOP, mode=Mode.PRIVATE)
    fillet5_piece_10 = split(fillet5_piece_10, bisect_by=Plane(origin=(-26.411718637, -34.996733289, 19.05), z_dir=(0, -1, 0)), keep=Keep.TOP, mode=Mode.PRIVATE)
    add(fillet5_piece_10)

    # Sketch12 → Boss-Extrude7 (add)
    with BuildSketch(Plane.ZY.offset(30.221718637)):
        Polygon((29.21, -40.076733289), (38.1, -40.076733289), (46.99, -40.076733289), (46.99, -36.266733289), (38.1, -36.266733289), (29.21, -36.266733289), align=None)
    extrude(amount=BOSS_EXTRUDE7_DEPTH)

    # Fillet6
    fillet6_edges = [part.edges().sort_by_distance(p)[0] for p in [
        (-42.921718637, -38.171733289, 46.99),
        (-42.921718637, -38.171733289, 29.21),
    ]]
    fillet(fillet6_edges, radius=FILLET6_R)

    # Sketch13 → Cut-Extrude4 (cut)
    with BuildSketch(Plane(origin=(0, -36.266733289, 0), x_dir=(1, 0, 0), z_dir=(0, 1, 0))):
        with Locations(Location((-36.571718637, -38.1, 0), (0, 0, 270))):
            Circle(SKETCH13_R)
    extrude(amount=-CUT_EXTRUDE4_DEPTH, mode=Mode.SUBTRACT)


solid = part.part
